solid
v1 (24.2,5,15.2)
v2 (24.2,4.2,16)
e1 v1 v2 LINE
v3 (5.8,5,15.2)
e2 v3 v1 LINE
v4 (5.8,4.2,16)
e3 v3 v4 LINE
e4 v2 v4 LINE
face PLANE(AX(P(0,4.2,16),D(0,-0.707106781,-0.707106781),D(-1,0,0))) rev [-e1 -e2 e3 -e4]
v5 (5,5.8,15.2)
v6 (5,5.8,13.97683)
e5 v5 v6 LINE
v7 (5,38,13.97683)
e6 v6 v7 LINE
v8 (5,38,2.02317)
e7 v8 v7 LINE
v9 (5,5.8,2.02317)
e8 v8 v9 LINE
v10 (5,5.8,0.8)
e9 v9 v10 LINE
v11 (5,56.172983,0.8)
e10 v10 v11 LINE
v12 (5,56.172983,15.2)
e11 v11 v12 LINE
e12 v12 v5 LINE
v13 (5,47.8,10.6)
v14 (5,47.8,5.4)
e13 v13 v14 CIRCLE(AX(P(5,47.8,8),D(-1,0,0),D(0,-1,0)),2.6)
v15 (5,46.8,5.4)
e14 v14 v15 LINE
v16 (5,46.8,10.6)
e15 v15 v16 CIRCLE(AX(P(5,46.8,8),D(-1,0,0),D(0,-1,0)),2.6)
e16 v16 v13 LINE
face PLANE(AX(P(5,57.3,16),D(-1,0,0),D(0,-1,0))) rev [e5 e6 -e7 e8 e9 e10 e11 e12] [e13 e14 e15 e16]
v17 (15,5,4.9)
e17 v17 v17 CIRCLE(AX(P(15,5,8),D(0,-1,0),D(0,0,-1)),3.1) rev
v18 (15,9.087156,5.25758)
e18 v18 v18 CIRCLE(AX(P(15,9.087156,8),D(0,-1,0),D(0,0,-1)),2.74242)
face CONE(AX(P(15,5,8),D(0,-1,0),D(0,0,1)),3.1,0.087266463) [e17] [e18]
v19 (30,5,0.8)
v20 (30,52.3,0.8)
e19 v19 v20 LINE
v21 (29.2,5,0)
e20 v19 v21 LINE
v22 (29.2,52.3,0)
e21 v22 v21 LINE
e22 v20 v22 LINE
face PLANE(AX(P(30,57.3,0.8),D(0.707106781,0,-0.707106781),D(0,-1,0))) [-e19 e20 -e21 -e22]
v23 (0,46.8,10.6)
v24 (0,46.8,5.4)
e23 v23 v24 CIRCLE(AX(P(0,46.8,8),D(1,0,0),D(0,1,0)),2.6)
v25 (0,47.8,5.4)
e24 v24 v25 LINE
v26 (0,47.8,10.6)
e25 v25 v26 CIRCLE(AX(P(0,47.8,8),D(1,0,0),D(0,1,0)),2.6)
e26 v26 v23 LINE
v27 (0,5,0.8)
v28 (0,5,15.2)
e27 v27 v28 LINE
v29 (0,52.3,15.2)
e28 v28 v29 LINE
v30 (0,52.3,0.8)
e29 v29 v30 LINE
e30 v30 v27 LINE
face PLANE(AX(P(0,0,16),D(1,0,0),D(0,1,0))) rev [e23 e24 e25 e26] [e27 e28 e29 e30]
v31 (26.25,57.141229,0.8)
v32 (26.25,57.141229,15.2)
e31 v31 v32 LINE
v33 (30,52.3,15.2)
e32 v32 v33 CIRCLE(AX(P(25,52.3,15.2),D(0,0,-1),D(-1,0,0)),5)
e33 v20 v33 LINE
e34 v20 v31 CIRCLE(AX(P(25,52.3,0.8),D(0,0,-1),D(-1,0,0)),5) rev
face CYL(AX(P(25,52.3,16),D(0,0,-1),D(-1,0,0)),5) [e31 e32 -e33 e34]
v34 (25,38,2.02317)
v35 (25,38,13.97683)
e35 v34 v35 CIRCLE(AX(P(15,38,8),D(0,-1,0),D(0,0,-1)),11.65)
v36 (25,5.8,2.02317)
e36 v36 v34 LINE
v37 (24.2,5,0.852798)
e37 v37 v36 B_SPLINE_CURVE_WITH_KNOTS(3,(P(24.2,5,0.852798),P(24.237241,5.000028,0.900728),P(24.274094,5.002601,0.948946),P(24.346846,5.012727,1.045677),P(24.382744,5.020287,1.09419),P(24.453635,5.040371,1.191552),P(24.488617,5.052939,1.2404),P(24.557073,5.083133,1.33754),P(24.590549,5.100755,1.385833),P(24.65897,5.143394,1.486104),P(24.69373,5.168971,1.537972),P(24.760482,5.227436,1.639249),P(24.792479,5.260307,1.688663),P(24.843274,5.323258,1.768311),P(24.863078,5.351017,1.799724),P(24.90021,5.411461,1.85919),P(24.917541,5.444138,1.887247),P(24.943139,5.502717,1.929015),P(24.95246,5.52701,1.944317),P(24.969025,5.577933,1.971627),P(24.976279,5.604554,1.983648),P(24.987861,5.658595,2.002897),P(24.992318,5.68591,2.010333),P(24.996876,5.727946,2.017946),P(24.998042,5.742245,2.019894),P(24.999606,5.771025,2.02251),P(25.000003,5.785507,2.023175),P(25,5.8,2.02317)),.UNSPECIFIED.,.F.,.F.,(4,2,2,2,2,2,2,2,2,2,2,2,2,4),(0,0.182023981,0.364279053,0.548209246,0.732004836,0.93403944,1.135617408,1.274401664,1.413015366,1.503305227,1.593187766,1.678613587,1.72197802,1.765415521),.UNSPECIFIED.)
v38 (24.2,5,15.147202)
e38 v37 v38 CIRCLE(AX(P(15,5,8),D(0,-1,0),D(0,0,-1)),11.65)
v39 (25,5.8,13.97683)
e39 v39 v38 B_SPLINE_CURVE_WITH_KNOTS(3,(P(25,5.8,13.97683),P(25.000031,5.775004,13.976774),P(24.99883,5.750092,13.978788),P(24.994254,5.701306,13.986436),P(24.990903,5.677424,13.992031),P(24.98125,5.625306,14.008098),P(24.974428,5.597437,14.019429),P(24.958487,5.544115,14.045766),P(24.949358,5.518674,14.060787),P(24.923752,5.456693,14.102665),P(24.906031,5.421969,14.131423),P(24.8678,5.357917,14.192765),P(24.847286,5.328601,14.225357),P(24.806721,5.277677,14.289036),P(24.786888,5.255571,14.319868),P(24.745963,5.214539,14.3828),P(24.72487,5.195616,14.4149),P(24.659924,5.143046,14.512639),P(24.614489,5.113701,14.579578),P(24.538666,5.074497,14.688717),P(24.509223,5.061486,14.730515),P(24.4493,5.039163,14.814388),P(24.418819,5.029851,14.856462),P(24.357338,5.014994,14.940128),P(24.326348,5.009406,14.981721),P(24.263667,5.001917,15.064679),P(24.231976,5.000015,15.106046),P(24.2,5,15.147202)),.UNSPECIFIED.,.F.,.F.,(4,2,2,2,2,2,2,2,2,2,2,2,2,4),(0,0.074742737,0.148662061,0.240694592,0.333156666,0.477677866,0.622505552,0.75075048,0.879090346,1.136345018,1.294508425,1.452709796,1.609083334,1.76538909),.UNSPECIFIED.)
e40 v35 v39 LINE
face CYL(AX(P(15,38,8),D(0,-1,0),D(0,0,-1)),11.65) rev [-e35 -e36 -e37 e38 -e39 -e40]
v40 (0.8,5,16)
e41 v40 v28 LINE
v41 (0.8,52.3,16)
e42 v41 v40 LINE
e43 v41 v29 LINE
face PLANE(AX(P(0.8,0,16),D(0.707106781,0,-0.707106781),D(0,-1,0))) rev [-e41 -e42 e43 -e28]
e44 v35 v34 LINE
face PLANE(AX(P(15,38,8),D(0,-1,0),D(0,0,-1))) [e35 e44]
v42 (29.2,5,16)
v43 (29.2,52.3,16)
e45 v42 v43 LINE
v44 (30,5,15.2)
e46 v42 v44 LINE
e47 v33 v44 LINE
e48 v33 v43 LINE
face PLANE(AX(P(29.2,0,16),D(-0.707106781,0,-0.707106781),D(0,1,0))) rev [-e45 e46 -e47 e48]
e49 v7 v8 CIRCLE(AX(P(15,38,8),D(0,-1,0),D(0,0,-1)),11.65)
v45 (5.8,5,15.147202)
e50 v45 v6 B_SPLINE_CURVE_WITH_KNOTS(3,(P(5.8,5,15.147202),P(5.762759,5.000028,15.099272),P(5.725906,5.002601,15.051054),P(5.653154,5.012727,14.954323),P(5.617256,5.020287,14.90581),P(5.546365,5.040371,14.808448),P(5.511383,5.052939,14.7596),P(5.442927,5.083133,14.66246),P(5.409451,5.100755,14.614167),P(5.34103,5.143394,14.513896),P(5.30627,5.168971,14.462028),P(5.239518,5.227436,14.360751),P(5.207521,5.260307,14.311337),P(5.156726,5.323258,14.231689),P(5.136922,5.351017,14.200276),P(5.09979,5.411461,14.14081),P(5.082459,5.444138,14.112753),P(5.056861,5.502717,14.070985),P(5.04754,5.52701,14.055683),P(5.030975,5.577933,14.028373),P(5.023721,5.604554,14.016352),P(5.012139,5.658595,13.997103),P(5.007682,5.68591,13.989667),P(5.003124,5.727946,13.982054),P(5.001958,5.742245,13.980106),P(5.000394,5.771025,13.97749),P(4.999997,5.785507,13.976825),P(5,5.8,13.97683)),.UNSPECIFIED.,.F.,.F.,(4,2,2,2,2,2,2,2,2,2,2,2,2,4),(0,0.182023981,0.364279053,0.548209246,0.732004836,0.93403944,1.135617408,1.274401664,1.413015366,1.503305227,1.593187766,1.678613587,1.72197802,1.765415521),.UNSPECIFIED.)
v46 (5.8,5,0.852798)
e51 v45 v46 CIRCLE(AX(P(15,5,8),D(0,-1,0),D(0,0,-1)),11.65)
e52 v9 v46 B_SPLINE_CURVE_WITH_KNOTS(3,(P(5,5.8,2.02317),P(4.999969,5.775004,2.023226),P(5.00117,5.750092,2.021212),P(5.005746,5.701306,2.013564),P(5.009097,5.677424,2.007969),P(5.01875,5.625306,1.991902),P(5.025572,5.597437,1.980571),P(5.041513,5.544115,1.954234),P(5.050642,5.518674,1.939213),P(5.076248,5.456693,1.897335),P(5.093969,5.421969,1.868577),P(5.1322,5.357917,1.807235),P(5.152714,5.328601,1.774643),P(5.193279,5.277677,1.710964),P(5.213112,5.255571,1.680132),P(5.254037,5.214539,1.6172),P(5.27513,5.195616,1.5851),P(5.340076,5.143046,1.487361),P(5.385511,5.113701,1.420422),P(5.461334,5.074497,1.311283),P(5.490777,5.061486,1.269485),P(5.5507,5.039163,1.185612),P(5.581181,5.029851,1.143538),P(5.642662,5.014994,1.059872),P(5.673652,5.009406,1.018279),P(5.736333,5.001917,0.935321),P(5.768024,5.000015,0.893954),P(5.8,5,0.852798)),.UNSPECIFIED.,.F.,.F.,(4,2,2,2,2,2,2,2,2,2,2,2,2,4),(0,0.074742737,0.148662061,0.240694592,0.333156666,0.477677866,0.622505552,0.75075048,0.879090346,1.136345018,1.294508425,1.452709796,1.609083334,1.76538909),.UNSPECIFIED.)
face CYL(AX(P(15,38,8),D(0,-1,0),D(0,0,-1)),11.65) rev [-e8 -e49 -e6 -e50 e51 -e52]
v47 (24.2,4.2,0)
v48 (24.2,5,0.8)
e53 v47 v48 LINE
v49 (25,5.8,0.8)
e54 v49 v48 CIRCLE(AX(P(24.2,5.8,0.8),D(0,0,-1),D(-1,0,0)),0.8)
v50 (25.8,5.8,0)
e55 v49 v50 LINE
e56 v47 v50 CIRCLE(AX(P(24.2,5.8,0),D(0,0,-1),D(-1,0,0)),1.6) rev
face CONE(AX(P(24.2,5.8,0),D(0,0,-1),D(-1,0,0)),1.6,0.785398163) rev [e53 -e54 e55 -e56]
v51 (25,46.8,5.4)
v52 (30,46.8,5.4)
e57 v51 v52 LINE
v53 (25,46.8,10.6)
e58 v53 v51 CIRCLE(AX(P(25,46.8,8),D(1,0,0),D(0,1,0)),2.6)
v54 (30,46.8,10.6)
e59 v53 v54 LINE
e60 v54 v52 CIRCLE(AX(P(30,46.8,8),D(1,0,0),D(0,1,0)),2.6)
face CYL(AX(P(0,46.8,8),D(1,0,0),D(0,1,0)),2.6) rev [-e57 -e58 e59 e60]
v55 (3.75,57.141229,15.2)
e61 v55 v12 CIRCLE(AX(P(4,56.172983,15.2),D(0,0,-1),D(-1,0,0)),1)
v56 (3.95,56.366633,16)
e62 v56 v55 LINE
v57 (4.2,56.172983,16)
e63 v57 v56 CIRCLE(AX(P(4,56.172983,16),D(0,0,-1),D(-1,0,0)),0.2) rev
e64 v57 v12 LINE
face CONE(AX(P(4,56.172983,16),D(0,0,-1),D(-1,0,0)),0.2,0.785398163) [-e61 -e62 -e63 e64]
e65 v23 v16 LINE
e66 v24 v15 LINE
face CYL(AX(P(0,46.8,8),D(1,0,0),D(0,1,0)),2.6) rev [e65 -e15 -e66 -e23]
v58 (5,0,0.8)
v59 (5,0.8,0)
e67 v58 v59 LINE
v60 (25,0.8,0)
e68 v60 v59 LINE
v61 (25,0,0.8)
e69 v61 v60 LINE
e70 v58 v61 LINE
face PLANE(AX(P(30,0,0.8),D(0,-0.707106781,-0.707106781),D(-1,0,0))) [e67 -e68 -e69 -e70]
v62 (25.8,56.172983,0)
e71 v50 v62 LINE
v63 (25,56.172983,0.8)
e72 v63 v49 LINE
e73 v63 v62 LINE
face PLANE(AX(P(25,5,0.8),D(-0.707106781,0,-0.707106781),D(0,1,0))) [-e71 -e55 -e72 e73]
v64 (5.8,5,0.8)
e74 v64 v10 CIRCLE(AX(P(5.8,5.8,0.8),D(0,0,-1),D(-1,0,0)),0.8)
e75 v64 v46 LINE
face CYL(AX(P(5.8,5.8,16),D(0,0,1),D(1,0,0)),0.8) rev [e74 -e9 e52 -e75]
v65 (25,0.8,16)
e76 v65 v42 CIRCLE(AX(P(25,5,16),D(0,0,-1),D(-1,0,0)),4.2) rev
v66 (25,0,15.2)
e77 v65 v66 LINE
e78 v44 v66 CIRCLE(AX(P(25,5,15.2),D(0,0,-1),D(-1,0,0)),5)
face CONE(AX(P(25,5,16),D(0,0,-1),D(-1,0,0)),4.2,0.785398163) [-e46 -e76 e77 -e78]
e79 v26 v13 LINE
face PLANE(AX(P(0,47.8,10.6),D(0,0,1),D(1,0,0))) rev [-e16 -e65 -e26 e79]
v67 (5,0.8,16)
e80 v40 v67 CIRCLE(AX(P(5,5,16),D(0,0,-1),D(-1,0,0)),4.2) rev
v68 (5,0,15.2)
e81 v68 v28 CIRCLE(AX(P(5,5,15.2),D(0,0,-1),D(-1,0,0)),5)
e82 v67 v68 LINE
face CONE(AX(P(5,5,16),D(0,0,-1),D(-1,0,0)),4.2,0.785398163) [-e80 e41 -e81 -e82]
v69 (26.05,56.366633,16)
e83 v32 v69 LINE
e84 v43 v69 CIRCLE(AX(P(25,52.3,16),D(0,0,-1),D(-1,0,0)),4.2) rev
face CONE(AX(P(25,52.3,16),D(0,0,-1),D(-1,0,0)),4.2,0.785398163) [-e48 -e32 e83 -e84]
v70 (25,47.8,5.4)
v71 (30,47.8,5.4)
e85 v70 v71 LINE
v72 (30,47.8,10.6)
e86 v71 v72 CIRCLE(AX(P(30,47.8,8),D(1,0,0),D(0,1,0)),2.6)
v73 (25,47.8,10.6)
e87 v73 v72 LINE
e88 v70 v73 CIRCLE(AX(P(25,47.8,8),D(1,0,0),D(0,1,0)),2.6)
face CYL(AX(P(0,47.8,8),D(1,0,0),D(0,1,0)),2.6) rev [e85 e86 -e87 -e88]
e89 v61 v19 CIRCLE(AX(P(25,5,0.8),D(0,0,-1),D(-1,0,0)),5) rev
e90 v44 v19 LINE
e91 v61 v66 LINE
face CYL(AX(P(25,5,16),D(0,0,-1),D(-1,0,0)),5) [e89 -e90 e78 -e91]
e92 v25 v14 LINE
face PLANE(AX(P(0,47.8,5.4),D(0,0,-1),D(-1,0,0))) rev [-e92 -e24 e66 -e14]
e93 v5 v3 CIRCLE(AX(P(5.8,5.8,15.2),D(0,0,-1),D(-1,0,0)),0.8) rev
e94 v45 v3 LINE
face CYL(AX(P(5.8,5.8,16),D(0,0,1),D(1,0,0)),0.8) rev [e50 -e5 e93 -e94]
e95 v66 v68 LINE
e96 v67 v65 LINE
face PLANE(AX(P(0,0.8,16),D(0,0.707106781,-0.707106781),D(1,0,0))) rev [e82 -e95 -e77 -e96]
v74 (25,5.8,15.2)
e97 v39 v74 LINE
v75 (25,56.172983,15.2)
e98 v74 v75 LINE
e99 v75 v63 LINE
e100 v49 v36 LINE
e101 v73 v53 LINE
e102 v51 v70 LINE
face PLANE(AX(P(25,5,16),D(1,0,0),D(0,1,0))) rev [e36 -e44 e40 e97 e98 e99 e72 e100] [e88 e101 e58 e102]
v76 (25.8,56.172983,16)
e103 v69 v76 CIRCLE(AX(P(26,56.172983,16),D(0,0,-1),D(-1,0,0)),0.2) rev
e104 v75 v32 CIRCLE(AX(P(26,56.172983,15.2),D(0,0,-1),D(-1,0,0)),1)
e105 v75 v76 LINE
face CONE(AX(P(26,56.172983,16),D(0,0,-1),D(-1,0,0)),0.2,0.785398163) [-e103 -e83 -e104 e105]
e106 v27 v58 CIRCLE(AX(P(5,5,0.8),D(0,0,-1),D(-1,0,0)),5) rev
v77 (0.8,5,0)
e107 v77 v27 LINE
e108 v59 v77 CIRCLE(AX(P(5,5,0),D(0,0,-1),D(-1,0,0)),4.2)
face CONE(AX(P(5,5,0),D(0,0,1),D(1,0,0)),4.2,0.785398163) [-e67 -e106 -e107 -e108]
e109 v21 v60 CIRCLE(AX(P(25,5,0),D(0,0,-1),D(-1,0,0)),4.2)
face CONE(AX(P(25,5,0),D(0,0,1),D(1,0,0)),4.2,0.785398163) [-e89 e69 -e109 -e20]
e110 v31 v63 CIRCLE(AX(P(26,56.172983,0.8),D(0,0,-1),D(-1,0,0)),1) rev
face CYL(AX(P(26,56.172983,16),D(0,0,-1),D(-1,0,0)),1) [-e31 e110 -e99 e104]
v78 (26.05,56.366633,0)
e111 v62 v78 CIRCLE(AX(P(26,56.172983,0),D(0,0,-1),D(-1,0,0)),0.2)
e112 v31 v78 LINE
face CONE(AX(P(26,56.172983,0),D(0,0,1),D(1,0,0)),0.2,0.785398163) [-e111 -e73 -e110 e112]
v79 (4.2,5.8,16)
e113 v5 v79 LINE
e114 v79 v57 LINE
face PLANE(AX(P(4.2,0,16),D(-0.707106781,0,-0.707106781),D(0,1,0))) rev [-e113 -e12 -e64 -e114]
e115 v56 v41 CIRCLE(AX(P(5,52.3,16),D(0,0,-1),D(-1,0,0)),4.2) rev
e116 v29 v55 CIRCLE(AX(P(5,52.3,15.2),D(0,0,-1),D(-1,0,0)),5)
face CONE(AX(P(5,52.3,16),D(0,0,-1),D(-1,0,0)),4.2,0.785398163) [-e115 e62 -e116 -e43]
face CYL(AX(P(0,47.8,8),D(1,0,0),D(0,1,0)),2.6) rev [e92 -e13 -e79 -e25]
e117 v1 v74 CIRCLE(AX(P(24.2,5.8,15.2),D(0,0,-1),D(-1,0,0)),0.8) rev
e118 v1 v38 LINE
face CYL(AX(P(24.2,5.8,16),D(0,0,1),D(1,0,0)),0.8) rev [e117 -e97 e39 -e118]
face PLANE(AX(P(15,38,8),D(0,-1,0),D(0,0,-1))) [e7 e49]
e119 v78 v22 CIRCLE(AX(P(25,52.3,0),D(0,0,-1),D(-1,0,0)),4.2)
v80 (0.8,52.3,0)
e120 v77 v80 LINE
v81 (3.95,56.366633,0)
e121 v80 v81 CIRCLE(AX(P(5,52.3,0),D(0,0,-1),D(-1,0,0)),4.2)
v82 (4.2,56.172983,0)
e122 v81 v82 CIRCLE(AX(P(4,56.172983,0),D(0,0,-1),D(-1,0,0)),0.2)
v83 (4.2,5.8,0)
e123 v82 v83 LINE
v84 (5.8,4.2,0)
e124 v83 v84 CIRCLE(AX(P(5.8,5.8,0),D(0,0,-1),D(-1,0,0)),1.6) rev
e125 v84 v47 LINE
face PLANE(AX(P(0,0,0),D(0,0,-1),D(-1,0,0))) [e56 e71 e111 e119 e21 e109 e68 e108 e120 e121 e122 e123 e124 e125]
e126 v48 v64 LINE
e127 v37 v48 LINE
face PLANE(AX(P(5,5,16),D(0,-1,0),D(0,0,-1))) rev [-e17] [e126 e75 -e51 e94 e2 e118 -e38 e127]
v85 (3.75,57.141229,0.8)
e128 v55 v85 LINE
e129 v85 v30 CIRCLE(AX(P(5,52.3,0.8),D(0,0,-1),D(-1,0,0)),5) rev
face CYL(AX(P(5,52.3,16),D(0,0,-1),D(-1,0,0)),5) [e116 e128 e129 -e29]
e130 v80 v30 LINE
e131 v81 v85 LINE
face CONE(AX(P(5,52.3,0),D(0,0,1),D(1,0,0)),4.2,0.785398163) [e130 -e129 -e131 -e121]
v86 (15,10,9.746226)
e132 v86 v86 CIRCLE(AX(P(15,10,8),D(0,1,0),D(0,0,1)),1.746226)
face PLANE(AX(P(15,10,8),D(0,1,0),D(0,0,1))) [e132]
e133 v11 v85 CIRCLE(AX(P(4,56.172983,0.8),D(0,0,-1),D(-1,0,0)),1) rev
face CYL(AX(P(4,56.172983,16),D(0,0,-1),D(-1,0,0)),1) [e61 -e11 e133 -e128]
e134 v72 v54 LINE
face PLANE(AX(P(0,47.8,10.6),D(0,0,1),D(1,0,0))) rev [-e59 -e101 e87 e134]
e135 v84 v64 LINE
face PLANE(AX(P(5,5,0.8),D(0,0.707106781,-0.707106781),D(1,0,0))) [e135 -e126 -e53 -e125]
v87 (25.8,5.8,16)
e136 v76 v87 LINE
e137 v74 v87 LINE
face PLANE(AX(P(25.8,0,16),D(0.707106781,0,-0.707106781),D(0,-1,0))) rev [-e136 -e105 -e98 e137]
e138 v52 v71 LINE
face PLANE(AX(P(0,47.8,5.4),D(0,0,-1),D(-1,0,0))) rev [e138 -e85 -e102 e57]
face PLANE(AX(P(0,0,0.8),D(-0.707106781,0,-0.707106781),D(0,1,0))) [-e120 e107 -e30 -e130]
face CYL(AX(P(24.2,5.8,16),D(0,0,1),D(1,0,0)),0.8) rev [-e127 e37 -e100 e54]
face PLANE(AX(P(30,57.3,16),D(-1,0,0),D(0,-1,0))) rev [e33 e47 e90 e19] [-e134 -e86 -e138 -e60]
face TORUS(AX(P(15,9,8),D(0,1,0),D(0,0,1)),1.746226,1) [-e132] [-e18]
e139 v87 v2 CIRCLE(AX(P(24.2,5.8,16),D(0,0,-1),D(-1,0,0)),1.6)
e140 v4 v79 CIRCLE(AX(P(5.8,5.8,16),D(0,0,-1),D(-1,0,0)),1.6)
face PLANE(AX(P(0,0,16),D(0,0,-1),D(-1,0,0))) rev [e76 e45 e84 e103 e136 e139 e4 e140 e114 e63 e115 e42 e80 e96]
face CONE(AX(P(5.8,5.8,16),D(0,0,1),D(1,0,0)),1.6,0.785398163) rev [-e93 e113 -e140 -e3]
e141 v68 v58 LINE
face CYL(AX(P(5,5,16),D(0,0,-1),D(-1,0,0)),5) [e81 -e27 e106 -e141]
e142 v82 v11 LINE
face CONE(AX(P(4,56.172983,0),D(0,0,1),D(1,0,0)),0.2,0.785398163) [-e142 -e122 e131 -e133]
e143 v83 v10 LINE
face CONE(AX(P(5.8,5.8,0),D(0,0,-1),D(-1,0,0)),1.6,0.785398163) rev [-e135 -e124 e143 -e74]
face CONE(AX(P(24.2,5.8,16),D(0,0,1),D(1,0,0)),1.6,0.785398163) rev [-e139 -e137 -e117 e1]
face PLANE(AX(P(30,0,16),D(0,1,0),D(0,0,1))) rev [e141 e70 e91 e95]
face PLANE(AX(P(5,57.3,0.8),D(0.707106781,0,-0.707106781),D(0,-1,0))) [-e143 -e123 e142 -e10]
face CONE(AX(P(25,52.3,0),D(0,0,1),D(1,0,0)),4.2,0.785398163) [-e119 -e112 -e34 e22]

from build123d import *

# Parameters (mm, degrees)
BOSS_EXTRUDE1_DEPTH = 16
FILLET3_R           = 0.8
CUT_EXTRUDE1_START  = 5
SKETCH3_R           = 11.65
CUT_EXTRUDE1_DEPTH  = 33
SKETCH2_R           = 3.1
BOSS_EXTRUDE2_DEPTH = 5
BOSS_EXTRUDE2_TAPER = 5
CUT_EXTRUDE2_DEPTH  = 67.627997142
FILLET1_R           = 5
FILLET2_R           = 1
CHAMFER2_SIZE       = 0.8


with BuildPart() as part:
    # Sketch1 → Boss-Extrude1 (new body)
    with BuildSketch(Plane.XY):
        Polygon((0, 0), (0, 57.3), (5, 57.3), (5, 5), (25, 5), (25, 57.3), (30, 57.3), (30, 0), align=None)
    extrude(amount=BOSS_EXTRUDE1_DEPTH)

    # Fillet3
    fillet3_edges = [part.edges().sort_by_distance(p)[0] for p in [
        (5, 5, 8),
        (25, 5, 8),
    ]]
    fillet(fillet3_edges, radius=FILLET3_R)

    # Sketch3 → Cut-Extrude1 (cut)
    with BuildSketch(Plane(origin=(0, 0, 0), x_dir=(1, 0, 0), z_dir=(0, 1, 0)).offset(CUT_EXTRUDE1_START)):
        with Locations((15, -8)):
            Circle(SKETCH3_R)
    extrude(amount=CUT_EXTRUDE1_DEPTH, mode=Mode.SUBTRACT)

    # Sketch2 → Boss-Extrude2 (add)
    with BuildSketch(Plane(origin=(0, 5, 0), x_dir=(1, 0, 0), z_dir=(0, 1, 0))):
        with Locations((15, -8)):
            Circle(SKETCH2_R)
    extrude(amount=BOSS_EXTRUDE2_DEPTH, taper=BOSS_EXTRUDE2_TAPER)

    # Sketch5 → Cut-Extrude2 (cut, through all)
    with BuildSketch(Plane(origin=(30, 0, 0), x_dir=(0, 0, -1), z_dir=(1, 0, 0))):
        with BuildLine():
            Line((-5.4, 47.8), (-5.4, 46.8))
            ThreePointArc((-5.4, 46.8), (-8, 44.2), (-10.6, 46.8))
            Line((-10.6, 46.8), (-10.6, 47.8))
            ThreePointArc((-10.6, 47.8), (-8, 50.4), (-5.4, 47.8))
        make_face()
    extrude(amount=-CUT_EXTRUDE2_DEPTH, mode=Mode.SUBTRACT)

    # Fillet1
    fillet1_edges = [part.edges().sort_by_distance(p)[0] for p in [
        (0, 0, 8),
        (30, 0, 8),
        (30, 57.3, 8),
        (0, 57.3, 8),
    ]]
    fillet(fillet1_edges, radius=FILLET1_R - 0.0001)  # a hair under: the kernel refuses the full size

    # Fillet2
    fillet2_edges = [part.edges().sort_by_distance(p)[0] for p in [
        (5, 57.3, 8),
        (25, 57.3, 8),
        (12.337443318, 10, 8),
    ]]
    fillet(fillet2_edges, radius=FILLET2_R)

    # Chamfer2
    chamfer2_edges = [part.edges().sort_by_distance(p)[0] for p in [
        (1.047161628, 55.361939214, 0),
        (30, 28.65, 16),
        (15, 0, 16),
        (0, 28.65, 16),
        (28.535563195, 1.464436805, 16),
        (1.464436805, 1.464436805, 16),
        (28.952838372, 55.361939214, 16),
        (25, 30.986502943, 16),
        (25, 30.986502943, 0),
        (28.952838372, 55.361939214, 0),
        (4.61238009, 56.963569371, 0),
        (25.38761991, 56.963569371, 0),
        (1.047161628, 55.361939214, 16),
        (4.61238009, 56.963569371, 16),
        (25.38761991, 56.963569371, 16),
        (5, 30.986502943, 0),
        (5, 30.986502943, 16),
        (15, 5, 0),
        (15, 5, 16),
        (5.234314575, 5.234314575, 0),
        (5.234314575, 5.234314575, 16),
        (24.765685425, 5.234314575, 0),
        (24.765685425, 5.234314575, 16),
        (15, 0, 0),
        (0, 28.65, 0),
        (30, 28.65, 0),
        (28.535563195, 1.464436805, 0),
        (1.464436805, 1.464436805, 0),
    ]]
    chamfer(chamfer2_edges, length=CHAMFER2_SIZE)


solid = part.part
